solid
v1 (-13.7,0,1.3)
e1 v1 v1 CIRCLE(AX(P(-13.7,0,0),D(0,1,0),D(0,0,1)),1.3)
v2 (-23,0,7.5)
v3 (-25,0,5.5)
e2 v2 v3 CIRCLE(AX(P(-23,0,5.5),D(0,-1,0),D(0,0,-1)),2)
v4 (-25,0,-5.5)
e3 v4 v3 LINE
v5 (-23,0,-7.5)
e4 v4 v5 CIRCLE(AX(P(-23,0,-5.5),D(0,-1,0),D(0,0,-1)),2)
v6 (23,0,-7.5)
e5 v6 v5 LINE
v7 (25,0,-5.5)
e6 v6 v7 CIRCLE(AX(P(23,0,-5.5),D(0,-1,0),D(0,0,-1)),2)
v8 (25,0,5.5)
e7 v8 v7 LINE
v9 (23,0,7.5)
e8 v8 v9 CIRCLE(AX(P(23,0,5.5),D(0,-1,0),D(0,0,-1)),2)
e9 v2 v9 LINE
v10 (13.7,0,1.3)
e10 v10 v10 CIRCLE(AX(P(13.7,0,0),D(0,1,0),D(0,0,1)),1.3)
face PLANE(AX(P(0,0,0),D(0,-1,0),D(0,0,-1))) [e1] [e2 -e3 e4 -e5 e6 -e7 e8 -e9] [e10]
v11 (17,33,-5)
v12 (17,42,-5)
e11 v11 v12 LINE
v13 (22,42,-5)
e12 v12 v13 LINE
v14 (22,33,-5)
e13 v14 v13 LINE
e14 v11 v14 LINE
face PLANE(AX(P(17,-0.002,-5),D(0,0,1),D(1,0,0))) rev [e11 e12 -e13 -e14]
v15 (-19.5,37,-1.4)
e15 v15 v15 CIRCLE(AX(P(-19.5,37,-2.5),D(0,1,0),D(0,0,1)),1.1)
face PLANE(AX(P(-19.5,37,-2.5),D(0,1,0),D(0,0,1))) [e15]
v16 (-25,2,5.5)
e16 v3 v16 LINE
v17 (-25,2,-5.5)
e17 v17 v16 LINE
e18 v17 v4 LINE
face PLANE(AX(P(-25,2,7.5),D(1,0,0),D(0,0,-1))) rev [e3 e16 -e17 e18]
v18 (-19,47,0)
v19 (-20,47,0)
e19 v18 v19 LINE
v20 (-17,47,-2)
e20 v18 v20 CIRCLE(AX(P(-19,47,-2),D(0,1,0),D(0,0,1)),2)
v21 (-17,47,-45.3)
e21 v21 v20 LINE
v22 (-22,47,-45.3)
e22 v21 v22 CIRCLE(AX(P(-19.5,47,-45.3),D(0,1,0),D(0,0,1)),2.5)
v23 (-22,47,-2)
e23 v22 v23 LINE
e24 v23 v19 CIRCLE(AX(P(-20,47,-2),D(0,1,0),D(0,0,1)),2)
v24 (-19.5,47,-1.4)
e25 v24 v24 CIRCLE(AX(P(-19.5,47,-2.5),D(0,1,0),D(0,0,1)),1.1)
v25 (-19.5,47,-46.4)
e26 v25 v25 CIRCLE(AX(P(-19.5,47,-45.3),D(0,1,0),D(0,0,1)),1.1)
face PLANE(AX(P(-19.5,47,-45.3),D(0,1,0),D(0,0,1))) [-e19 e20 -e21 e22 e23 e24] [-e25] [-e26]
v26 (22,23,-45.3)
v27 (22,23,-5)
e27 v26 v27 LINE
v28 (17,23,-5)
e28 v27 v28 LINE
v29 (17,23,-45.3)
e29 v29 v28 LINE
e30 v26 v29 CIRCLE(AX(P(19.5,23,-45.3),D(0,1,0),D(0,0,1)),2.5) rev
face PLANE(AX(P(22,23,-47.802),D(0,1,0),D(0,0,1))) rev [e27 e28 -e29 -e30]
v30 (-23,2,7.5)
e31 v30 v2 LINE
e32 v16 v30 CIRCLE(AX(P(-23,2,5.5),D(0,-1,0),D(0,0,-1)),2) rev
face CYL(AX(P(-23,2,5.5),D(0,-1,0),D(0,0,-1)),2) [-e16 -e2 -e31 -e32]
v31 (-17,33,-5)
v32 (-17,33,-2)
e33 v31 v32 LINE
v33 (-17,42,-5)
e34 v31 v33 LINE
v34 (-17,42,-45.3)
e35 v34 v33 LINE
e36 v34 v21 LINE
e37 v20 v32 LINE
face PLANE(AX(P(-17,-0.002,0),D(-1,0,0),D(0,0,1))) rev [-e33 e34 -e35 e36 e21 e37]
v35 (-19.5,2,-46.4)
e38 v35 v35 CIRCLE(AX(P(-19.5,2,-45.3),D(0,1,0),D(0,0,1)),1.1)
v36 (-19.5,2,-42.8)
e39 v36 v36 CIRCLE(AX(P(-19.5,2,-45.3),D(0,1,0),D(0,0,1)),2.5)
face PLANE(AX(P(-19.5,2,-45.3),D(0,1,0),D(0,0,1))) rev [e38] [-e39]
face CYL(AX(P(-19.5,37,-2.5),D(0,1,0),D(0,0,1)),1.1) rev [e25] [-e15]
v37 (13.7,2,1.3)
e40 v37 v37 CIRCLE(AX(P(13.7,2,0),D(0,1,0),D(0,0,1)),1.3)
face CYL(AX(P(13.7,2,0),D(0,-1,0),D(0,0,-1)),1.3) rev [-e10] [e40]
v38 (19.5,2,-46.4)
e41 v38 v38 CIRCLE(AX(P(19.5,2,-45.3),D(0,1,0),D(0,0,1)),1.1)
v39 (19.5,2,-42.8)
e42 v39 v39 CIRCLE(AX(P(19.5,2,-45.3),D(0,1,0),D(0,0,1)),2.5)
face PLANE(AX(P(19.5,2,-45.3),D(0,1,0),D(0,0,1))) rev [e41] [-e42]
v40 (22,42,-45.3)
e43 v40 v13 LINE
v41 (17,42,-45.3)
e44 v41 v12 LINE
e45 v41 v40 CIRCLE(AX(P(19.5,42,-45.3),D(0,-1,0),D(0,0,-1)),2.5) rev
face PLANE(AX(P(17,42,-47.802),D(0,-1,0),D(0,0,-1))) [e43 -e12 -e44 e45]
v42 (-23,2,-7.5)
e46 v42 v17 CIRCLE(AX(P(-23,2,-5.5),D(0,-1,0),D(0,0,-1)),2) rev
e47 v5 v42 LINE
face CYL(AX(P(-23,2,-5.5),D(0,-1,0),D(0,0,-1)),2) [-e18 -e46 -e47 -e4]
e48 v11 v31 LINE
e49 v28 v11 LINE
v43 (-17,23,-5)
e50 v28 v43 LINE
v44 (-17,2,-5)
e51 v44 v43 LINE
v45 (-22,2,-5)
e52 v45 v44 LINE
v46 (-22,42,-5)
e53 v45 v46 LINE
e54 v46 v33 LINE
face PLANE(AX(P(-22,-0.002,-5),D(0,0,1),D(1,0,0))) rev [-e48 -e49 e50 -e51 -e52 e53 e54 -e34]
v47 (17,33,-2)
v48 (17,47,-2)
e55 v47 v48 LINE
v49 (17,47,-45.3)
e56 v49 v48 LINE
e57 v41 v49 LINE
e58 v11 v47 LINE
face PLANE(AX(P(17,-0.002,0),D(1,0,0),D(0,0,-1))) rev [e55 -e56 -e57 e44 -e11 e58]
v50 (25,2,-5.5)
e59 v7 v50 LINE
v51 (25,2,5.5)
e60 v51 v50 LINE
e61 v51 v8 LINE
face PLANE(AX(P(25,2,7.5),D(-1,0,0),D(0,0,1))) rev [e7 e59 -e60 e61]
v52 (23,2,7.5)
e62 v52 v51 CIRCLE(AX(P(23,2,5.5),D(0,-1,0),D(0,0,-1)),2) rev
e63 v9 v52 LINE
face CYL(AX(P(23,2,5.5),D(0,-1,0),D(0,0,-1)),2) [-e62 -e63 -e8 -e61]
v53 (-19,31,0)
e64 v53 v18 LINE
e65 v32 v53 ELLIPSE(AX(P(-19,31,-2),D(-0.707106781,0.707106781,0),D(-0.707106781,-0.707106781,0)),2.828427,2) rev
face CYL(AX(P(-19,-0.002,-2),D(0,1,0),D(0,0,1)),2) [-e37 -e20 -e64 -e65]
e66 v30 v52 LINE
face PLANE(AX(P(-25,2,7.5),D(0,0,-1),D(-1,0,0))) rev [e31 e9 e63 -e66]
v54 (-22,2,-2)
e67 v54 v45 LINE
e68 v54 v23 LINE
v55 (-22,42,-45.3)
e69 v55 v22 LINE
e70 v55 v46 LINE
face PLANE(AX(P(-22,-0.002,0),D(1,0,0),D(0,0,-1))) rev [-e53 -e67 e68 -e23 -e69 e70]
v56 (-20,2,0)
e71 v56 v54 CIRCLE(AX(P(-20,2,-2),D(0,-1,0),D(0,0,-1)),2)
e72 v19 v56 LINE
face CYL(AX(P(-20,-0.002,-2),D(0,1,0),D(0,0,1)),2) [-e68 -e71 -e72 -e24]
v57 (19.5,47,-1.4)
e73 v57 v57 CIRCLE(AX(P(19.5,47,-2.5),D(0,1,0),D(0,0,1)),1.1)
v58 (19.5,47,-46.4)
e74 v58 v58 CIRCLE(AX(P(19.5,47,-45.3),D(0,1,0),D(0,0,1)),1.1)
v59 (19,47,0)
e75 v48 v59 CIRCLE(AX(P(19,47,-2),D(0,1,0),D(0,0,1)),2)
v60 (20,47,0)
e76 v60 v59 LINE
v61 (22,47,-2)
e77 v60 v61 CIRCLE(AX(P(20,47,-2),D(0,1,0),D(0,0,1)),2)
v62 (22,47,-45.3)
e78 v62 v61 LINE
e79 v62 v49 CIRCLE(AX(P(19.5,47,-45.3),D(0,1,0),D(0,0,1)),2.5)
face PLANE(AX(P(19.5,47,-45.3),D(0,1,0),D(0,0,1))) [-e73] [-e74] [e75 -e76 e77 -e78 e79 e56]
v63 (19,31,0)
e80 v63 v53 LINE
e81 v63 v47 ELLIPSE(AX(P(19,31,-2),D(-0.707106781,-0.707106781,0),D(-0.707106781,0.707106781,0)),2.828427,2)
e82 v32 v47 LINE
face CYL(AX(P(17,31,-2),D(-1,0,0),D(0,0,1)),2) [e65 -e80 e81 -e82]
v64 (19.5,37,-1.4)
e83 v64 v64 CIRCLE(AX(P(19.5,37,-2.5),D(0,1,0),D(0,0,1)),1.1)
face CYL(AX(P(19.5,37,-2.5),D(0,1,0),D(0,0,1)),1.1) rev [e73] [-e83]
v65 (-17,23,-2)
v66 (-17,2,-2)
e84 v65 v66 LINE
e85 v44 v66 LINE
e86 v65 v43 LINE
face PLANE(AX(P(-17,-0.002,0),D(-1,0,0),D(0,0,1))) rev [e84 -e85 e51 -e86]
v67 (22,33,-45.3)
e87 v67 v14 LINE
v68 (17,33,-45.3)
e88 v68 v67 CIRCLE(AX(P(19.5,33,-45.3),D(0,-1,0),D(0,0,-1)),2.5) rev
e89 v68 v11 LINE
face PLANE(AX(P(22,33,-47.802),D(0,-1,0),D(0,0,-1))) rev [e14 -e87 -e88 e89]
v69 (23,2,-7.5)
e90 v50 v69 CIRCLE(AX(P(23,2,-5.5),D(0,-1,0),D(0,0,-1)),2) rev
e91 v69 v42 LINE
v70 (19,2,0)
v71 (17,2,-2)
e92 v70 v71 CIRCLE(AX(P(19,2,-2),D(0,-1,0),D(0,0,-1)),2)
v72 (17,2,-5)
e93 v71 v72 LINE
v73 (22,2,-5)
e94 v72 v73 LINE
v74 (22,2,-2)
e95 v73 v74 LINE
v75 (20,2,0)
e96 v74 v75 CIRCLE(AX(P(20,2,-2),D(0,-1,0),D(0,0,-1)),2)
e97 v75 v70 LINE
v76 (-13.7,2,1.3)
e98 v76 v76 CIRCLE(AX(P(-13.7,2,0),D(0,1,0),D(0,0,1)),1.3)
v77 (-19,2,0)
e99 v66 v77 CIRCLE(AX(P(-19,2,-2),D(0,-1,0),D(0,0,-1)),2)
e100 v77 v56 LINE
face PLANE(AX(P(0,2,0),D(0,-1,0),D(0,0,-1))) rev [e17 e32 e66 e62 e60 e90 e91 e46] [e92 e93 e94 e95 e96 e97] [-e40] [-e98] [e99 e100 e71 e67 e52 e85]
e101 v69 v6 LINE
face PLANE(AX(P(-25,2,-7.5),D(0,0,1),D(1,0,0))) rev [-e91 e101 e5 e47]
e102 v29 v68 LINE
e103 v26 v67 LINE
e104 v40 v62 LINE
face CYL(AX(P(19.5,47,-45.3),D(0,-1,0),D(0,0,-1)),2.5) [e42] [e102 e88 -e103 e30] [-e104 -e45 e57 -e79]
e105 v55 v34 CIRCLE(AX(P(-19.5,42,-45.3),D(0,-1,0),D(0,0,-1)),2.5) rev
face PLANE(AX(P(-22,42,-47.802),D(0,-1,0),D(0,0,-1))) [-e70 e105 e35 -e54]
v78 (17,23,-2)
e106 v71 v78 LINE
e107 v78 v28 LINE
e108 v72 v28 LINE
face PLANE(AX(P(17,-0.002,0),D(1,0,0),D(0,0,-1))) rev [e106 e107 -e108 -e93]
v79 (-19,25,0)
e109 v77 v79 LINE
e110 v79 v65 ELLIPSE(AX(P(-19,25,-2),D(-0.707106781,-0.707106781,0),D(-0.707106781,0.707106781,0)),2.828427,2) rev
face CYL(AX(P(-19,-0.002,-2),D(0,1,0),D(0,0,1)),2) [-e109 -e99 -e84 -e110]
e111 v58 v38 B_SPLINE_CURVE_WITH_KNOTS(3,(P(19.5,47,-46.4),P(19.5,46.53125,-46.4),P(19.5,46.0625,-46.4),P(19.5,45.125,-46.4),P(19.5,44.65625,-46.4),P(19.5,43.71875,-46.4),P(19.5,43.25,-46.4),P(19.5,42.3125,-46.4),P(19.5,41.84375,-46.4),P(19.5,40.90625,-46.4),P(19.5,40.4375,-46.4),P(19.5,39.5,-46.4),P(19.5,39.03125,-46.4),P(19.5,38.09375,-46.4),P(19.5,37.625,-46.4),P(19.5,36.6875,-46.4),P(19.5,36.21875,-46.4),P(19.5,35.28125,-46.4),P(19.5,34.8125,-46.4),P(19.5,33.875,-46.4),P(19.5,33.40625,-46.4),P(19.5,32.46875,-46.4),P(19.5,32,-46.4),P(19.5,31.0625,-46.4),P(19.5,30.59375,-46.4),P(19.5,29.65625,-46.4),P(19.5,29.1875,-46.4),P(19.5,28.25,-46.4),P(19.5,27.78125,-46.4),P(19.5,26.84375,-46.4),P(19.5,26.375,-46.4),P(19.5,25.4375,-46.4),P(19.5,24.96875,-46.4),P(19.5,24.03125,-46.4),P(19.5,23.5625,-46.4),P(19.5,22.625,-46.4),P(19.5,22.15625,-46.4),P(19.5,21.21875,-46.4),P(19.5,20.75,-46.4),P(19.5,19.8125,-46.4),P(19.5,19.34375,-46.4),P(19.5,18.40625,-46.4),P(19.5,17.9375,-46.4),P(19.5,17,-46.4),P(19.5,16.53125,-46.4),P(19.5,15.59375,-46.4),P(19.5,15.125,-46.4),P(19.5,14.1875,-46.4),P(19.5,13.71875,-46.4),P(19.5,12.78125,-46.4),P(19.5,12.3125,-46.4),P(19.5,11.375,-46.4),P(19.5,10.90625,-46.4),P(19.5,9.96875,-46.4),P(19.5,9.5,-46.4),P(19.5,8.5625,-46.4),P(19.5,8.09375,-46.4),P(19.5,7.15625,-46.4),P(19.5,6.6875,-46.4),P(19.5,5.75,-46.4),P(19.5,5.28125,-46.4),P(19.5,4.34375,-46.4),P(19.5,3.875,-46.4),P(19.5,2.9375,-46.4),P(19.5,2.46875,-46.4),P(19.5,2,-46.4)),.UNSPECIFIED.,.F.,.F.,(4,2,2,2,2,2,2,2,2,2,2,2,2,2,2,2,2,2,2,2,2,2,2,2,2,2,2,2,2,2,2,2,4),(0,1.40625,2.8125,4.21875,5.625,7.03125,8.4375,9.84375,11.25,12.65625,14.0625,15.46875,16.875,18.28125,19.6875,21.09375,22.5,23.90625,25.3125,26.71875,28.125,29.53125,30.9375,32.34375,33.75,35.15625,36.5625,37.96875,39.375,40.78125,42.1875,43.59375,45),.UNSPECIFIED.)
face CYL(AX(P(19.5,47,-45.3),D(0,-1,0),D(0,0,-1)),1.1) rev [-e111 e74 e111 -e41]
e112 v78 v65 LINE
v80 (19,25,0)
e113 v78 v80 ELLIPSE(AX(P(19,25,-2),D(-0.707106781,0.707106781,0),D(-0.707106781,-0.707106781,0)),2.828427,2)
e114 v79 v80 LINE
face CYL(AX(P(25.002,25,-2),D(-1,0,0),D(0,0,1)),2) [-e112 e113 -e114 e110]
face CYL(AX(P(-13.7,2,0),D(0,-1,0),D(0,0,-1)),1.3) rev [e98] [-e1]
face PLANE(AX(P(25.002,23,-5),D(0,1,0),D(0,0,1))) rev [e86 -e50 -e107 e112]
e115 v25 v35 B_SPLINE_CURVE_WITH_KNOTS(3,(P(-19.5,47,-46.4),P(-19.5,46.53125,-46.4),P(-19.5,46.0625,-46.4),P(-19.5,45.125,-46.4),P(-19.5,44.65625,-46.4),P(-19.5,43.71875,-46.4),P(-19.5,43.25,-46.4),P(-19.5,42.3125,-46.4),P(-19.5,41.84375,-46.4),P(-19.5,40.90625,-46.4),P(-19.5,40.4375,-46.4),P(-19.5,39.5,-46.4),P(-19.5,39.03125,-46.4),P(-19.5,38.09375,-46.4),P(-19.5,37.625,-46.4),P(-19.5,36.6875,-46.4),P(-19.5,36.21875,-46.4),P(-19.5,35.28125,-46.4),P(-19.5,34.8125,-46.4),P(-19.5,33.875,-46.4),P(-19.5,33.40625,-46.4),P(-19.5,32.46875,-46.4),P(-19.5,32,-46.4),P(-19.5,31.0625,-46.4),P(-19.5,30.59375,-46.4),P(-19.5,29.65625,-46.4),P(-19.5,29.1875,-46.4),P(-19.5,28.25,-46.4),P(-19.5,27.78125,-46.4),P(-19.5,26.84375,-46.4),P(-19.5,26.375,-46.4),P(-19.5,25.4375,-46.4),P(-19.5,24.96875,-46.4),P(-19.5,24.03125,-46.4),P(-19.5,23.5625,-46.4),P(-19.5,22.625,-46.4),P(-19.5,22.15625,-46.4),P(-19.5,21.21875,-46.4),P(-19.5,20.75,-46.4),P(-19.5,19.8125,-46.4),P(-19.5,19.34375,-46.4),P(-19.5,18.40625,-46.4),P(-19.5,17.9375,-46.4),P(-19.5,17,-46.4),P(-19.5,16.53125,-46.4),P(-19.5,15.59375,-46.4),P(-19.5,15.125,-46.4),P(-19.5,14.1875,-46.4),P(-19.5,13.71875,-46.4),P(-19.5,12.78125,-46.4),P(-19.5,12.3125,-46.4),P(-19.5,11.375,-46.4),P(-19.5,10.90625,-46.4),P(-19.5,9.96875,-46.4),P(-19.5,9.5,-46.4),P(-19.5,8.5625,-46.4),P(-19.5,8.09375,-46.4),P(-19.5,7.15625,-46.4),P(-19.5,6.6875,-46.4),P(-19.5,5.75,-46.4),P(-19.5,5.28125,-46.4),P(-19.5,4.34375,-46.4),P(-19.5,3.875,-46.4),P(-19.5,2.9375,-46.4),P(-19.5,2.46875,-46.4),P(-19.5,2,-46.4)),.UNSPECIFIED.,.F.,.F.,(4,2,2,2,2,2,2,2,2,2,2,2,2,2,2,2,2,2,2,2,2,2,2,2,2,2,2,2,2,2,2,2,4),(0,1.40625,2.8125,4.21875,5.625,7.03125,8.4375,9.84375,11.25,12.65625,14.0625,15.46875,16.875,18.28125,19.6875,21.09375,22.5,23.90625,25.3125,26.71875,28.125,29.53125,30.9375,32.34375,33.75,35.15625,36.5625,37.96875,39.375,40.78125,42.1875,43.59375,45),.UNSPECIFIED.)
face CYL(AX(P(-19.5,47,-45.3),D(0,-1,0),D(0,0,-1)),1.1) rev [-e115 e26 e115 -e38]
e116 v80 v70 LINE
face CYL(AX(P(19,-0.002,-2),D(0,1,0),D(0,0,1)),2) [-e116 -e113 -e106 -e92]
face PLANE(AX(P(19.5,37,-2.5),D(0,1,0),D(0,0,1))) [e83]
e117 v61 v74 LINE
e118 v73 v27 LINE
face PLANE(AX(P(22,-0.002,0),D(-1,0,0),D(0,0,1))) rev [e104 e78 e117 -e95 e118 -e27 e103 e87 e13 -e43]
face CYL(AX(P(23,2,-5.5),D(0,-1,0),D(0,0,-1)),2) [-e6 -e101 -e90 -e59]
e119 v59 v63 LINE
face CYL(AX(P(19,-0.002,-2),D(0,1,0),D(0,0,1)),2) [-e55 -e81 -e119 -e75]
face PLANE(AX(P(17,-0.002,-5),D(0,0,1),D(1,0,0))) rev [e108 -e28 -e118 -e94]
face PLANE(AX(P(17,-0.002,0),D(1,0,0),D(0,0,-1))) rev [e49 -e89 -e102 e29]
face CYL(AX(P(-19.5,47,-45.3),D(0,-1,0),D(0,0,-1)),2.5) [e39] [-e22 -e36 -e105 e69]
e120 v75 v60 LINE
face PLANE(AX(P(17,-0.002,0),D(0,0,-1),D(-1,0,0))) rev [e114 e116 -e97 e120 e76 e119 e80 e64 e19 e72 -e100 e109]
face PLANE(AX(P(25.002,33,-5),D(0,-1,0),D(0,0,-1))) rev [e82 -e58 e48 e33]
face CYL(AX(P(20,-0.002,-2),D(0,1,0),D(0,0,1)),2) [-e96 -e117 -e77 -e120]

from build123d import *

# Parameters (mm, degrees)
SKETCH_1_W           = 50
SKETCH_1_H           = 15
SKETCH_1_R           = 1.3
EXTRUDE_1_DEPTH      = 2
SKETCH_2_R           = 2.5
SKETCH_2_R_2         = 1.1
EXTRUDE_2_DEPTH      = 45
EXTRUDE_2_2_DEPTH    = 45
EXTRUDE_START        = 42
EXTRUDE_3_DEPTH      = 5
SKETCH_4_W           = 5
SKETCH_4_H           = 5
EXTRUDE_4_DEPTH      = 40
SKETCH_5_R           = 1.1
CUT_EXTRUDE_1_DEPTH  = 10
EXTRUDE_5_REACH      = 70.307
EXTRUDE_5_END_RADIUS = 2.5
SKETCH_7_W           = 5
SKETCH_7_H           = 10
FILLET_1_R           = 2
EXTRUDE_6_REACH      = 81.107
SKETCH_8_W           = 5
SKETCH_8_H           = 10
FILLET_3_R           = 2


# Read off the part's stored shape, not the designer's step: 凸台-拉伸3
with BuildPart() as part:
    # 草图1 → 凸台-拉伸1 (new body)
    with BuildSketch(Plane(origin=(0, 0, 0), x_dir=(1, 0, 0), z_dir=(0, 1, 0))):
        Rectangle(SKETCH_1_W, SKETCH_1_H)
        with Locations(Location((-13.7, 0, 0), (0, 0, 270))):
            Circle(SKETCH_1_R, mode=Mode.SUBTRACT)
        with Locations(Location((13.7, 0, 0), (0, 0, 270))):
            Circle(SKETCH_1_R, mode=Mode.SUBTRACT)
    extrude(amount=EXTRUDE_1_DEPTH)



with BuildPart() as body_2:
    # 草图2 → 凸台-拉伸2 (new body)
    with BuildSketch(Plane(origin=(0, 2, 0), x_dir=(1, 0, 0), z_dir=(0, 1, 0))):
        with Locations(Location((19.5, 45.3, 0), (0, 0, 90))):
            Circle(SKETCH_2_R)
        with Locations(Location((19.5, 45.3, 0), (0, 0, 90))):
            Circle(SKETCH_2_R_2, mode=Mode.SUBTRACT)
    extrude(amount=EXTRUDE_2_DEPTH)



with BuildPart() as body_3:
    # 草图2 → Extrude 2 2 (new body)
    with BuildSketch(Plane(origin=(0, 2, 0), x_dir=(1, 0, 0), z_dir=(0, 1, 0))):
        with Locations(Location((-19.5, 45.3, 0), (0, 0, 90))):
            Circle(SKETCH_2_R)
        with Locations(Location((-19.5, 45.3, 0), (0, 0, 90))):
            Circle(SKETCH_2_R_2, mode=Mode.SUBTRACT)
    extrude(amount=EXTRUDE_2_2_DEPTH)


with BuildPart() as body_2_1:
    add(body_2.part)

    add(body_3.part)  # 凸台-拉伸3 merges body 3
    # 凸台-拉伸3 outline → 凸台-拉伸3 (add)
    with BuildSketch(Plane(origin=(0, 0, 0), x_dir=(1, 0, 0), z_dir=(0, 1, 0)).offset(EXTRUDE_START)):
        with BuildLine():
            Line((-22, 0), (-17, 0))
            Line((-17, 0), (-17, 45.3))
            ThreePointArc((-17, 45.3), (-19.5, 42.8), (-22, 45.3))
            Line((-22, 45.3), (-22, 0))
        make_face()
        with BuildLine():
            Line((17, 45.3), (17, 0))
            Line((17, 0), (22, 0))
            Line((22, 0), (22, 45.3))
            ThreePointArc((22, 45.3), (19.5, 42.8), (17, 45.3))
        make_face()
    extrude(amount=EXTRUDE_3_DEPTH)


with BuildPart() as part_1:
    add(part.part)

    add(body_2_1.part)  # 凸台-拉伸4 merges body 2
    # 草图4 → 凸台-拉伸4 (add)
    with BuildSketch(Plane.XZ.offset(-42)):
        with Locations((19.5, -2.5)):
            Rectangle(SKETCH_4_W, SKETCH_4_H)
        with Locations((-19.5, -2.5)):
            Rectangle(SKETCH_4_W, SKETCH_4_H)
    extrude(amount=EXTRUDE_4_DEPTH)

    # 草图5 → 切除-拉伸1 (cut)
    with BuildSketch(Plane(origin=(0, 47, 0), x_dir=(1, 0, 0), z_dir=(0, 1, 0))):
        with Locations(Location((-19.5, 2.5, 0), (0, 0, 270))):
            Circle(SKETCH_5_R)
        with Locations(Location((19.5, 2.5, 0), (0, 0, 270))):
            Circle(SKETCH_5_R)
    extrude(amount=-CUT_EXTRUDE_1_DEPTH, mode=Mode.SUBTRACT)

    # 凸台-拉伸5: up to this cylinder (the profile starts outside it)
    extrude_5_end = Plane(origin=(19.5, 28, -45.3), z_dir=(0, -1, 0)) * Cylinder(EXTRUDE_5_END_RADIUS, 146.614, mode=Mode.PRIVATE)
    # 草图7 → 凸台-拉伸5 (add, up to the surface)
    with BuildSketch(Plane(origin=(0, 0, -5), x_dir=(-1, 0, 0), z_dir=(0, 0, -1)), mode=Mode.PRIVATE) as extrude_5_sk1:
        with Locations((-19.5, 28)):
            Rectangle(SKETCH_7_W, SKETCH_7_H)
    extrude_5_tool1 = extrude(extrude_5_sk1.sketch, amount=EXTRUDE_5_REACH, mode=Mode.PRIVATE) - extrude_5_end
    add(extrude_5_tool1.solids().sort_by_distance((19.5, 28, -5))[0])

    # 圆角1
    fillet_1_edges = [part_1.edges().sort_by_distance(p)[0] for p in [
        (25, 1, 7.5),
        (-25, 1, 7.5),
        (-25, 1, -7.5),
        (25, 1, -7.5),
    ]]
    fillet(fillet_1_edges, radius=FILLET_1_R)

    # 草图8 → 凸台-拉伸6 (add, up to next)
    with BuildSketch(Plane(origin=(-17, 0, 0), x_dir=(0, 0, -1), z_dir=(1, 0, 0)), mode=Mode.PRIVATE) as extrude_6_sk1:
        with Locations((2.5, 28)):
            Rectangle(SKETCH_8_W, SKETCH_8_H)
    extrude_6_tool1 = extrude(extrude_6_sk1.sketch, amount=EXTRUDE_6_REACH, mode=Mode.PRIVATE) - part_1.part
    add(extrude_6_tool1.solids().sort_by_distance((-17, 28, -2.5))[0])

    # 圆角3
    fillet_3_edges = [part_1.edges().sort_by_distance(p)[0] for p in [
        (-17, 40, 0),
        (17, 40, 0),
        (0, 23, 0),
        (0, 33, 0),
        (17, 12.5, 0),
        (22, 24.5, 0),
        (-22, 24.5, 0),
        (-17, 12.5, 0),
    ]]
    fillet(fillet_3_edges, radius=FILLET_3_R)


solid = part_1.part
